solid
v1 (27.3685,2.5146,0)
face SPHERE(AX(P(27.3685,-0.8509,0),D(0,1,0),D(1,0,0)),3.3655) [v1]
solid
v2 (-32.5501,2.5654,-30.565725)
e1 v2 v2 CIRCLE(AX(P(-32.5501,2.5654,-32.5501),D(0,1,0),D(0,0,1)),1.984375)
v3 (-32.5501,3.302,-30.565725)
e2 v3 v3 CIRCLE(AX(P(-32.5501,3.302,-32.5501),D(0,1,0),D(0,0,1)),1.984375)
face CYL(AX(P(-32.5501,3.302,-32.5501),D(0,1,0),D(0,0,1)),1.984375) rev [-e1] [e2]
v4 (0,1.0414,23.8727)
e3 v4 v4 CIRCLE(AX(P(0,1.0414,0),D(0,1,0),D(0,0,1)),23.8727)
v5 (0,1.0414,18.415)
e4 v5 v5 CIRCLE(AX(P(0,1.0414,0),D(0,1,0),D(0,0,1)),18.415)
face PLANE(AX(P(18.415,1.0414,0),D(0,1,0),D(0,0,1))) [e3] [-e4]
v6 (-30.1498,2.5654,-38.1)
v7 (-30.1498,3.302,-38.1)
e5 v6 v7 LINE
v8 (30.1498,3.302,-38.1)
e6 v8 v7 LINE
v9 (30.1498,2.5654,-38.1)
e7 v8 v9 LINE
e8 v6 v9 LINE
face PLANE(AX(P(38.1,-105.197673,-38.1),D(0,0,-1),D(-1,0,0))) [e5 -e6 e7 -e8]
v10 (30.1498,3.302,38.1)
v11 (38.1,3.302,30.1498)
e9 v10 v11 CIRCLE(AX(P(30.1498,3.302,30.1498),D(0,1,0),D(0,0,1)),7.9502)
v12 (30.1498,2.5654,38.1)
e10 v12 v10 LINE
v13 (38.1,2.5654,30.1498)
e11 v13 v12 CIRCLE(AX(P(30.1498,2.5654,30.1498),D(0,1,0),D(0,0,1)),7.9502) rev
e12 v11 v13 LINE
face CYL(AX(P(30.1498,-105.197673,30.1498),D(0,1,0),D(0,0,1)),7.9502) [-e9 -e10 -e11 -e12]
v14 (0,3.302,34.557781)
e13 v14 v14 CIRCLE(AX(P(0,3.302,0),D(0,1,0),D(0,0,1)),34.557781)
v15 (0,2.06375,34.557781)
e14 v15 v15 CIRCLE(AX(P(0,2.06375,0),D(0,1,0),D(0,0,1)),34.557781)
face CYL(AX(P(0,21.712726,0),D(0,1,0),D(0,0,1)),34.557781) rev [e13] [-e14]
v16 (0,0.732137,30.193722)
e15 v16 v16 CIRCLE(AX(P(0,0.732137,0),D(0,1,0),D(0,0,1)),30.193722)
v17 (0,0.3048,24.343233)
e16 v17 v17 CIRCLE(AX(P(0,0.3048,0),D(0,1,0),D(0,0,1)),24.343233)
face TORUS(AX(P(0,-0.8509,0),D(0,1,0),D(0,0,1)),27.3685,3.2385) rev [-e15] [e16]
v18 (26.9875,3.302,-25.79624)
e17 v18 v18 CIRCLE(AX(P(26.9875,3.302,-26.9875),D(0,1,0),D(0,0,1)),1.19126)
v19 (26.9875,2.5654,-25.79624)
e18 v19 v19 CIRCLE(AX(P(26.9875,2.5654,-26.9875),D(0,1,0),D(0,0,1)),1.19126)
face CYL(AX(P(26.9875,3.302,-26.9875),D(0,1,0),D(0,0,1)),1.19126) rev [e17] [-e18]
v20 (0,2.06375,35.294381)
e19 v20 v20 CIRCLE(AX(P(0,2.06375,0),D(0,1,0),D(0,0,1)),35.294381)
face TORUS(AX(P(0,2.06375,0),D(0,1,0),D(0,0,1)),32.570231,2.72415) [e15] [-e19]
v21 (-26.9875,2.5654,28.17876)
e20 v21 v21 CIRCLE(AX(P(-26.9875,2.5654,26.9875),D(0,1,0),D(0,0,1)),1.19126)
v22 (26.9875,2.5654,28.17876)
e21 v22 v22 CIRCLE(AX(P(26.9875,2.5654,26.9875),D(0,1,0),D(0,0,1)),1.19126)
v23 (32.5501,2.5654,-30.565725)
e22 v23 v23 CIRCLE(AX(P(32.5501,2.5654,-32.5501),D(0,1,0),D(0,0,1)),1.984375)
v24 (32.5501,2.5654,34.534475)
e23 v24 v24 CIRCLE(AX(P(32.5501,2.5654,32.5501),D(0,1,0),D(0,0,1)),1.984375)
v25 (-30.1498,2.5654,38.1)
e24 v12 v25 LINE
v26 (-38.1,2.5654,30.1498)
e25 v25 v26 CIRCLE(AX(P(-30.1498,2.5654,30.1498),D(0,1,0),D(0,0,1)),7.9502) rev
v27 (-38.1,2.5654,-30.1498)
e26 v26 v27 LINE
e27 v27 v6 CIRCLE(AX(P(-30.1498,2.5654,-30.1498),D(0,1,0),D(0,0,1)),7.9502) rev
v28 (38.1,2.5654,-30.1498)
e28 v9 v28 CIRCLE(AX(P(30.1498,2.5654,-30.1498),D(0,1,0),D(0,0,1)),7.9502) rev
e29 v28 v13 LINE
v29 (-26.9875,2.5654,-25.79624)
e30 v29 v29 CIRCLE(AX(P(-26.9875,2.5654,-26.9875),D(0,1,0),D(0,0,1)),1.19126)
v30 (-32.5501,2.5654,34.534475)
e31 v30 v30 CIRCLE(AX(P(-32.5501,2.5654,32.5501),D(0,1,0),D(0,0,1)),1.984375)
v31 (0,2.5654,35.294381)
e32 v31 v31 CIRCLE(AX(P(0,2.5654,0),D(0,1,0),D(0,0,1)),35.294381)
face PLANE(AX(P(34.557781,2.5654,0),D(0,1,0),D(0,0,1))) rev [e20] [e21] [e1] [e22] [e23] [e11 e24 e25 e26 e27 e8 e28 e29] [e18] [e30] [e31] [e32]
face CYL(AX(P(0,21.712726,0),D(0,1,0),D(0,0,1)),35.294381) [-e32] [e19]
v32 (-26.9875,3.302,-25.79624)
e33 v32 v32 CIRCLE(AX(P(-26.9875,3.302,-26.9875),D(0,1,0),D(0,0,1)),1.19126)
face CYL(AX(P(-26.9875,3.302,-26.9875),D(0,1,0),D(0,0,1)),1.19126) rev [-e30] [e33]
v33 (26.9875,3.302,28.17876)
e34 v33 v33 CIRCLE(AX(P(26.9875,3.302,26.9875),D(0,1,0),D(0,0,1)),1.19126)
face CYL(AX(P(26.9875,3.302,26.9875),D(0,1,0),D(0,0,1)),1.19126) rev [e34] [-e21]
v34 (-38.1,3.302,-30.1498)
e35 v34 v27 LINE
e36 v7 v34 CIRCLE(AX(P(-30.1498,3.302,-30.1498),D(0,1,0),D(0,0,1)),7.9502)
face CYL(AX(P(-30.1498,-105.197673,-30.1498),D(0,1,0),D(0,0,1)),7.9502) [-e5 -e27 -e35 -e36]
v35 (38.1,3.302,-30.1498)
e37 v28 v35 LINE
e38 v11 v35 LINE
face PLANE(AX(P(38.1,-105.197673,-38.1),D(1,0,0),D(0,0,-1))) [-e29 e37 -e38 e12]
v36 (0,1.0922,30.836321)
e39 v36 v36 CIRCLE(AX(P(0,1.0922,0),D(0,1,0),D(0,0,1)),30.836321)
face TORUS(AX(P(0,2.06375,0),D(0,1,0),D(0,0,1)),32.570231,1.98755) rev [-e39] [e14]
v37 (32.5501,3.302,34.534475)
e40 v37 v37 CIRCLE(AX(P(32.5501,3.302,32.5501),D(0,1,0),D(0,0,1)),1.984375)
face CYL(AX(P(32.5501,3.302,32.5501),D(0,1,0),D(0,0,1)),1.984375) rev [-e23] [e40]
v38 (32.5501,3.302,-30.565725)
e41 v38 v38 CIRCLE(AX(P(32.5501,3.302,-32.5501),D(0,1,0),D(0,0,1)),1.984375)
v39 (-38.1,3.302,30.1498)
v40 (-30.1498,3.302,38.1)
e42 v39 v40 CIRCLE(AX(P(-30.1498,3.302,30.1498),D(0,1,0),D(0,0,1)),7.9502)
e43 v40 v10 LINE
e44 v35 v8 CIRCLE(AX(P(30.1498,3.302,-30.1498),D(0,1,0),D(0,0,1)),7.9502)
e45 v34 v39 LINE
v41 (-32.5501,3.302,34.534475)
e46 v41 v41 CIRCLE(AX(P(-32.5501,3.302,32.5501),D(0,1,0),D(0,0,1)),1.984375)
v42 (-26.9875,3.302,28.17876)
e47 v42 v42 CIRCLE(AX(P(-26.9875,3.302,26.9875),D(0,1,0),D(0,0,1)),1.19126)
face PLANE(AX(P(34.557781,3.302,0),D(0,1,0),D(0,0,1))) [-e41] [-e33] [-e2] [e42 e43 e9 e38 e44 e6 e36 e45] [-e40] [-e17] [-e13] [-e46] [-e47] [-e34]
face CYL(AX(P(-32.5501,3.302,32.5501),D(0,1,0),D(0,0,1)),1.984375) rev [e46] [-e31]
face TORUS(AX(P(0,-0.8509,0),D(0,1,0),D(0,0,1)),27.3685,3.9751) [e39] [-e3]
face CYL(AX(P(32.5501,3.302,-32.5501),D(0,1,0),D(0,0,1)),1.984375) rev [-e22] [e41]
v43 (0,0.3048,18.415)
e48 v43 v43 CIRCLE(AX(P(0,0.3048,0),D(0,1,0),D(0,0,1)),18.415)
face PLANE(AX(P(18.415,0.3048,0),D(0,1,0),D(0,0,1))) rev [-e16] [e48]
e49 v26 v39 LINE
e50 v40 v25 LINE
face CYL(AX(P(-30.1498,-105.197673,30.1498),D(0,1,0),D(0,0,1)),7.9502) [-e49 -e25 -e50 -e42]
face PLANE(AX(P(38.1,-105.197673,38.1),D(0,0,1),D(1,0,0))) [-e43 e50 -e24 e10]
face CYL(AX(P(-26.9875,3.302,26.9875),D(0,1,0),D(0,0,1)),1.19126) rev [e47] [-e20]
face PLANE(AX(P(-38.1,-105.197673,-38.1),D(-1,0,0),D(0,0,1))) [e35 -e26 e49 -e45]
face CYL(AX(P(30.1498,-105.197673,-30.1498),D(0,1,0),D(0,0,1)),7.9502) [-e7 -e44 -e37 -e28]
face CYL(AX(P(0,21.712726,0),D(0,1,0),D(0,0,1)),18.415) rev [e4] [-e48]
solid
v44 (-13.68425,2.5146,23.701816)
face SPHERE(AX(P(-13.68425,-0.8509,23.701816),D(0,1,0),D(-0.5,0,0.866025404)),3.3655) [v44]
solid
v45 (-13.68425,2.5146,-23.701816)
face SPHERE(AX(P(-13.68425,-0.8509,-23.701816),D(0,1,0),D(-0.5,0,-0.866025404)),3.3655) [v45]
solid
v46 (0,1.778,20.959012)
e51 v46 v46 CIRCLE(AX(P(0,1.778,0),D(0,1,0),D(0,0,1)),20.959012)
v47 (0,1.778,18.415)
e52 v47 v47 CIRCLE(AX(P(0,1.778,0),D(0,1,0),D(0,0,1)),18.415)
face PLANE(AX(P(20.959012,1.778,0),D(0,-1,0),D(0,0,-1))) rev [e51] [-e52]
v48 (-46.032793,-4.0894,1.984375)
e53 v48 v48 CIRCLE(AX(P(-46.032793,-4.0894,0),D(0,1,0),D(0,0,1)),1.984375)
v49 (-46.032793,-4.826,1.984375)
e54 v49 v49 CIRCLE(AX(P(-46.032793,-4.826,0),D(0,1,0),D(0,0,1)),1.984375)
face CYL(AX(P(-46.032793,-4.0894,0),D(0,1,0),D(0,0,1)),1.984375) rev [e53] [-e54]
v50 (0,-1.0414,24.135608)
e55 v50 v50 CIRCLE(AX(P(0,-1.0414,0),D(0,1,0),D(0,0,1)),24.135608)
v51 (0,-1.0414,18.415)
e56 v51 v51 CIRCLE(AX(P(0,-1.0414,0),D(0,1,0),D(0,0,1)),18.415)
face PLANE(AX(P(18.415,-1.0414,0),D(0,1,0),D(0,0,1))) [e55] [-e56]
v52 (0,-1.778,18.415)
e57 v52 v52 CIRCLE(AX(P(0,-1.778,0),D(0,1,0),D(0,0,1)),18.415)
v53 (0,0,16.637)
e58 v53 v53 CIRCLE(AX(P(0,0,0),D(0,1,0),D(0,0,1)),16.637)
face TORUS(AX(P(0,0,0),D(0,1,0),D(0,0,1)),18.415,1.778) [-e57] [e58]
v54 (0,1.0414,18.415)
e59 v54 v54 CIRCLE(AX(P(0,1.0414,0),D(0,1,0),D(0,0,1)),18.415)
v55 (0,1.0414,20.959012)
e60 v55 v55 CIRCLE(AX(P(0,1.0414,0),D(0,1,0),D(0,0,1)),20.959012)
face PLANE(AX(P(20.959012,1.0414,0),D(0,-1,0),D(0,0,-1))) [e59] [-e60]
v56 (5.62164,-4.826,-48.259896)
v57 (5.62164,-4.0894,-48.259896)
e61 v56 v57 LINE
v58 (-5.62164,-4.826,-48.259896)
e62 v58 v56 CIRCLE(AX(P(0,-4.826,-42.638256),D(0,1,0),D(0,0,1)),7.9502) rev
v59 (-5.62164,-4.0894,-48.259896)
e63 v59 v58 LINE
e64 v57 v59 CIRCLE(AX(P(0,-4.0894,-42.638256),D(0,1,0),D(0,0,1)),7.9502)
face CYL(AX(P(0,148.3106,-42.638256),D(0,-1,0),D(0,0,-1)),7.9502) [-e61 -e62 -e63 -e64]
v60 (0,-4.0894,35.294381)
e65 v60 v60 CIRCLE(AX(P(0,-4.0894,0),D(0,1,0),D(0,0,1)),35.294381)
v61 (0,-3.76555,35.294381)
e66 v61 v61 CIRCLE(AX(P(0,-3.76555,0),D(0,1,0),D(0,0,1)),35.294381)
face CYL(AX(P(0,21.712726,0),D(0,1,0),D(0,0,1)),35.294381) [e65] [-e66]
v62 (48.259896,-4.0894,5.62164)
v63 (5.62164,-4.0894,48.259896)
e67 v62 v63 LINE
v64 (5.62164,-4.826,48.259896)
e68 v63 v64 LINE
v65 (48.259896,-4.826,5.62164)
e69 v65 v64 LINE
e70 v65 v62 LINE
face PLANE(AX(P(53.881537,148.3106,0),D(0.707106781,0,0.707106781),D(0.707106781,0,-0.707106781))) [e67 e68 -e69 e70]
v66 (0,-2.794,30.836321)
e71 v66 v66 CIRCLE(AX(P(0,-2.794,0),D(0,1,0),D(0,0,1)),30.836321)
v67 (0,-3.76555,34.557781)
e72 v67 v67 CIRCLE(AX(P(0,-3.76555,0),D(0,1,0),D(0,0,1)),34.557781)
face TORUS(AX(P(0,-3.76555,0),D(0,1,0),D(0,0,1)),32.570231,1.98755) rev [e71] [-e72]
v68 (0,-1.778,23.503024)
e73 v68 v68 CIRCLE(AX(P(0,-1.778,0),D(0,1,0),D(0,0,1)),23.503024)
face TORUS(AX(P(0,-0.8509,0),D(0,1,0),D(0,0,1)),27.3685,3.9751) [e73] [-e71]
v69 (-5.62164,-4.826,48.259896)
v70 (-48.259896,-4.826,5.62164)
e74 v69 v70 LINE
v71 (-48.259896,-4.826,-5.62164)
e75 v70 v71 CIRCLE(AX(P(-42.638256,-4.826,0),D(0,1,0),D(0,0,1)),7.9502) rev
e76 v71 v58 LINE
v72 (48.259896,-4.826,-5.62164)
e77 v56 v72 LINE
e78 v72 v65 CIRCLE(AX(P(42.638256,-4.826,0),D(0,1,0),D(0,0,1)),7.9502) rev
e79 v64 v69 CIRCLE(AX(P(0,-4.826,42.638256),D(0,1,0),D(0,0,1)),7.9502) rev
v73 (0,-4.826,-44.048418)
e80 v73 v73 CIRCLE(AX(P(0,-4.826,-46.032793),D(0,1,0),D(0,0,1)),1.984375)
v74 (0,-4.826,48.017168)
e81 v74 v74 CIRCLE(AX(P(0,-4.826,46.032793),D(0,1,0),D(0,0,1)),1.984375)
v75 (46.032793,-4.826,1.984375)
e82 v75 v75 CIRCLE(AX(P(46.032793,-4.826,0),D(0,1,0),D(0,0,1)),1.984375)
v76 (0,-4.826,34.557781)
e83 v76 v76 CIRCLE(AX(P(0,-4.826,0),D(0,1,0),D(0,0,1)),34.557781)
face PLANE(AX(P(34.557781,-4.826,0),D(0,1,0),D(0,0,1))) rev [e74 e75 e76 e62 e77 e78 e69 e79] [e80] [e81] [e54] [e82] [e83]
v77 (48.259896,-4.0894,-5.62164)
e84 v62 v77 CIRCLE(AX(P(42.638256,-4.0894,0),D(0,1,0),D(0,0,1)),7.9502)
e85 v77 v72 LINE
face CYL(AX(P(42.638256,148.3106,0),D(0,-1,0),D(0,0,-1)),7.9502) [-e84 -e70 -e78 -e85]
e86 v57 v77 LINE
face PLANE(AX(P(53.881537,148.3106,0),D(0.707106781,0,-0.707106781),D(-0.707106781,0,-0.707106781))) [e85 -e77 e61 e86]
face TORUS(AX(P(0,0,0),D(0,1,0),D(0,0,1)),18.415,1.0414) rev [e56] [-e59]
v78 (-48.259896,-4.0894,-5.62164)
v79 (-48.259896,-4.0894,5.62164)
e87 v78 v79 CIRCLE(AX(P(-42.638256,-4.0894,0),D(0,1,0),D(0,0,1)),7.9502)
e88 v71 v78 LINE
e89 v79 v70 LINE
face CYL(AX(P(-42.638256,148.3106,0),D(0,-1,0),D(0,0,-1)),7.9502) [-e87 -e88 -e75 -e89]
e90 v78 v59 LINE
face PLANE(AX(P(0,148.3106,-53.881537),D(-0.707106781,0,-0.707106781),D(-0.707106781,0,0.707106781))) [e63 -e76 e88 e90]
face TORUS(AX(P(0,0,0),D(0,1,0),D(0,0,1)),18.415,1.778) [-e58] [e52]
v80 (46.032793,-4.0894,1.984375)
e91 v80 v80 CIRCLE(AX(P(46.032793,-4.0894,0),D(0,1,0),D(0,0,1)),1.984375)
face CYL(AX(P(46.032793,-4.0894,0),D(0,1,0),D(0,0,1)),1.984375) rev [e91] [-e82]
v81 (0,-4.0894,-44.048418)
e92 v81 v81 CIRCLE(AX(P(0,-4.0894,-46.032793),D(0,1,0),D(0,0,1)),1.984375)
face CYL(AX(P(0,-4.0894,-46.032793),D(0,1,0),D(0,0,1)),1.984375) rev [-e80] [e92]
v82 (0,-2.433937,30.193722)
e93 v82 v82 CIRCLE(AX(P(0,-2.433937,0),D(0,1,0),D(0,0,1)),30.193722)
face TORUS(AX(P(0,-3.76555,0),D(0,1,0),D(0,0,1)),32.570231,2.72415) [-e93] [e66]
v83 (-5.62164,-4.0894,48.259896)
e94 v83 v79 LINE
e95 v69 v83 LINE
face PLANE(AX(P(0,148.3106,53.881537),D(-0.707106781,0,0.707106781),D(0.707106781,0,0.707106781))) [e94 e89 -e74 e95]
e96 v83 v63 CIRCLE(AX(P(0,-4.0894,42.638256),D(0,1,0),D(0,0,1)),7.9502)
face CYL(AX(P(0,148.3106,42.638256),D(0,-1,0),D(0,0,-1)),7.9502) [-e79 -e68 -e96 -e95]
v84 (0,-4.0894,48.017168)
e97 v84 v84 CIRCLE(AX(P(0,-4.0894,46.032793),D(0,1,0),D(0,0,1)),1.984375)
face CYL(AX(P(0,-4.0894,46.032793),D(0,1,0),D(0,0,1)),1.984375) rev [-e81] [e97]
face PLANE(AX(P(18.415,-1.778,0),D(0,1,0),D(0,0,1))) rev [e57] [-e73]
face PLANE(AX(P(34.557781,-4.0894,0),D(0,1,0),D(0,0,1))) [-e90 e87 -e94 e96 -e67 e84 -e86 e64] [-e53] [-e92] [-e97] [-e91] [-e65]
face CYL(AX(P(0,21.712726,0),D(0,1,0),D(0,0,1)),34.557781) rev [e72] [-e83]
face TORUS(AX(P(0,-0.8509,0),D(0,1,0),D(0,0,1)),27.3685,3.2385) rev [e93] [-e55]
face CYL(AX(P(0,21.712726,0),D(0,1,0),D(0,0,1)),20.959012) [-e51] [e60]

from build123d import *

# Parameters (mm, degrees)
SKETCH2_R                                 = 34.557781481
EXTRUDE1_DEPTH                            = 0.7366
EXTRUDE2_START                            = -0.7366
SKETCH3_W                                 = 76.2
SKETCH3_H                                 = 76.2
SKETCH3_R                                 = 34.557781481
EXTRUDE2_DEPTH                            = 0.7366
CIRPATTERN1_COUNT                         = 3
FILLET1_R                                 = 7.9502
FILLET2_R                                 = 7.9502
SKETCH5_W                                 = 1.984375
SKETCH5_H                                 = 0.7366
F_5_32_0_156250_DIAMETER_HOLE1_AT_2_COUNT = 2
F_5_32_0_156250_DIAMETER_HOLE1_AT_2_PITCH = 65.1002
F_5_32_0_156250_DIAMETER_HOLE1_AT_3_COUNT = 2
F_5_32_0_156250_DIAMETER_HOLE1_AT_3_PITCH = 65.1002
F_5_32_0_156250_DIAMETER_HOLE1_AT_4_COUNT = 2
F_5_32_0_156250_DIAMETER_HOLE1_AT_4_PITCH = 92.065585753
SKETCH7_W                                 = 1.984375
SKETCH7_H                                 = 8.128
F_5_32_0_156250_DIAMETER_HOLE2_AT_2_COUNT = 2
F_5_32_0_156250_DIAMETER_HOLE2_AT_2_PITCH = 65.1002
F_5_32_0_156250_DIAMETER_HOLE2_AT_3_COUNT = 2
F_5_32_0_156250_DIAMETER_HOLE2_AT_3_PITCH = 92.065585753
F_5_32_0_156250_DIAMETER_HOLE2_AT_4_COUNT = 2
F_5_32_0_156250_DIAMETER_HOLE2_AT_4_PITCH = 65.1002
F_3_32_0_09375_DIAMETER_HOLE1_AT_2_COUNT  = 2
F_3_32_0_09375_DIAMETER_HOLE1_AT_2_PITCH  = 53.975
F_3_32_0_09375_DIAMETER_HOLE1_AT_3_COUNT  = 2
F_3_32_0_09375_DIAMETER_HOLE1_AT_3_PITCH  = 76.332177029
F_3_32_0_09375_DIAMETER_HOLE1_AT_4_COUNT  = 2
F_3_32_0_09375_DIAMETER_HOLE1_AT_4_PITCH  = 53.975


with BuildPart() as part:
    # Sketch1 → Revolve-Thin4 (revolve)
    with BuildSketch(Plane.XY, mode=Mode.PRIVATE) as revolve_thin4_sk:
        with BuildLine():
            Line((20.959011942, 1.778), (18.415, 1.778))
            ThreePointArc((18.415, 1.778), (16.637, 0), (18.415, -1.778))
            Line((18.415, -1.778), (23.503023884, -1.778))
            ThreePointArc((23.503023884, -1.778), (26.822976031, -4.788389506), (30.836320987, -2.794))
            ThreePointArc((30.836320987, -2.794), (33.072287853, -1.842454994), (34.557781481, -3.76555))
            Line((34.557781481, -3.76555), (34.557781481, -4.826))
            Line((34.557781481, -4.826), (38.1, -4.826))
            Line((38.1, -4.826), (38.1, -4.0894))
            Line((38.1, -4.0894), (35.294381481, -4.0894))
            Line((35.294381481, -4.0894), (35.294381481, -3.76555))
            ThreePointArc((35.294381481, -3.76555), (33.258353473, -1.129742468), (30.193721571, -2.433936741))
            ThreePointArc((30.193721571, -2.433936741), (26.643008112, -4.007091339), (24.135607796, -1.0414))
            Line((24.135607796, -1.0414), (18.415, -1.0414))
            ThreePointArc((18.415, -1.0414), (17.3736, 0), (18.415, 1.0414))
            Line((18.415, 1.0414), (20.959011942, 1.0414))
            Line((20.959011942, 1.0414), (20.959011942, 1.778))
        make_face()
    revolve(revolve_thin4_sk.sketch.rotate(Axis((0, 21.71272626, 0), (0, -1, 0)), 90), axis=Axis((0, 21.71272626, 0), (0, -1, 0)))

    # Sketch2 → Extrude1 (add)
    with BuildSketch(Plane.XZ.offset(4.826)):
        Polygon((53.881536726, 0), (0, -53.881536726), (-53.881536726, 0), (0, 53.881536726), align=None)
        with Locations(Location((0, 0, 0), (0, 0, 90))):
            Circle(SKETCH2_R, mode=Mode.SUBTRACT)
    extrude(amount=-EXTRUDE1_DEPTH)

    # Fillet2
    fillet2_edges = [part.edges().sort_by_distance(p)[0] for p in [
        (0, -4.4577, -53.881536726),
        (-53.881536726, -4.4577, 0),
        (0, -4.4577, 53.881536726),
        (53.881536726, -4.4577, 0),
    ]]
    fillet(fillet2_edges, radius=FILLET2_R)

    # Sketch5 → 5/32 (0.156250) Diameter Hole1 (revolve, cut)
    with BuildSketch(Plane(origin=(0, -4.0894, -46.032792877), x_dir=(0, 0, 1), z_dir=(1, 0, 0))):
        with Locations((0.9921875, 0.3683)):
            Rectangle(SKETCH5_W, SKETCH5_H)
    f_5_32_0_156250_diameter_hole1 = revolve(axis=Axis((0, 2.2606, -46.032792877), (0, -1, 0)), mode=Mode.SUBTRACT)

    # 5/32 (0.156250) Diameter Hole1 at 2: 5/32 (0.156250) Diameter Hole1 ×2
    with Locations(*[Vector(0.7071067811865476, 0, 0.7071067811865475) * (i * F_5_32_0_156250_DIAMETER_HOLE1_AT_2_PITCH) for i in range(1, F_5_32_0_156250_DIAMETER_HOLE1_AT_2_COUNT)]):
        add(f_5_32_0_156250_diameter_hole1, mode=Mode.SUBTRACT)

    # 5/32 (0.156250) Diameter Hole1 at 3: 5/32 (0.156250) Diameter Hole1 ×2
    with Locations(*[Vector(-0.7071067811865475, 0, 0.7071067811865477) * (i * F_5_32_0_156250_DIAMETER_HOLE1_AT_3_PITCH) for i in range(1, F_5_32_0_156250_DIAMETER_HOLE1_AT_3_COUNT)]):
        add(f_5_32_0_156250_diameter_hole1, mode=Mode.SUBTRACT)

    # 5/32 (0.156250) Diameter Hole1 at 4: 5/32 (0.156250) Diameter Hole1 ×2
    with Locations(*[(0, 0, i * F_5_32_0_156250_DIAMETER_HOLE1_AT_4_PITCH) for i in range(1, F_5_32_0_156250_DIAMETER_HOLE1_AT_4_COUNT)]):
        add(f_5_32_0_156250_diameter_hole1, mode=Mode.SUBTRACT)


with BuildPart() as body_2:
    # Sketch1<5> → Revolve-Thin5 (revolve)
    with BuildSketch(Plane.XY, mode=Mode.PRIVATE) as revolve_thin5_sk:
        with BuildLine():
            Line((18.415, 1.0414), (23.872699559, 1.0414))
            ThreePointArc((23.872699559, 1.0414), (27.339502199, 3.124094231), (30.836320987, 1.0922))
            ThreePointArc((30.836320987, 1.0922), (33.072287853, 0.140654994), (34.557781481, 2.06375))
            Line((34.557781481, 2.06375), (34.557781481, 3.302))
            Line((34.557781481, 3.302), (38.1, 3.302))
            Line((38.1, 3.302), (38.1, 2.5654))
            Line((38.1, 2.5654), (35.294381481, 2.5654))
            Line((35.294381481, 2.5654), (35.294381481, 2.06375))
            ThreePointArc((35.294381481, 2.06375), (33.258353473, -0.572057532), (30.193721571, 0.732136741))
            ThreePointArc((30.193721571, 0.732136741), (27.132579028, 2.378995284), (24.343233109, 0.3048))
            Line((24.343233109, 0.3048), (18.415, 0.3048))
            Line((18.415, 0.3048), (18.415, 1.0414))
        make_face()
    revolve(revolve_thin5_sk.sketch.rotate(Axis((0, 21.71272626, 0), (0, -1, 0)), 90), axis=Axis((0, 21.71272626, 0), (0, -1, 0)))

    # Sketch3 → Extrude2 (add)
    with BuildSketch(Plane(origin=(0, 3.302, 0), x_dir=(-1, 0, 0), z_dir=(0, 1, 0)).offset(EXTRUDE2_START)):
        Rectangle(SKETCH3_W, SKETCH3_H)
        with Locations(Location((0, 0, 0), (0, 0, 90))):
            Circle(SKETCH3_R, mode=Mode.SUBTRACT)
    extrude(amount=EXTRUDE2_DEPTH)

    # Fillet1
    fillet1_edges = [body_2.edges().sort_by_distance(p)[0] for p in [
        (-38.1, 2.9337, -38.1),
        (-38.1, 2.9337, 38.1),
        (38.1, 2.9337, 38.1),
        (38.1, 2.9337, -38.1),
    ]]
    fillet(fillet1_edges, radius=FILLET1_R)

    # Sketch7 → 5/32 (0.156250) Diameter Hole2 (revolve, cut)
    with BuildSketch(Plane(origin=(32.5501, 3.302, -32.5501), x_dir=(0, 0, 1), z_dir=(1, 0, 0))):
        with Locations((0.9921875, 4.064)):
            Rectangle(SKETCH7_W, SKETCH7_H)
    f_5_32_0_156250_diameter_hole2 = revolve(axis=Axis((32.5501, 9.652, -32.5501), (0, -1, 0)), mode=Mode.SUBTRACT)

    # 5/32 (0.156250) Diameter Hole2 at 2: 5/32 (0.156250) Diameter Hole2 ×2
    with Locations(*[(-i * F_5_32_0_156250_DIAMETER_HOLE2_AT_2_PITCH, 0, 0) for i in range(1, F_5_32_0_156250_DIAMETER_HOLE2_AT_2_COUNT)]):
        add(f_5_32_0_156250_diameter_hole2, mode=Mode.SUBTRACT)

    # 5/32 (0.156250) Diameter Hole2 at 3: 5/32 (0.156250) Diameter Hole2 ×2
    with Locations(*[Vector(-0.7071067811865476, 0, 0.7071067811865476) * (i * F_5_32_0_156250_DIAMETER_HOLE2_AT_3_PITCH) for i in range(1, F_5_32_0_156250_DIAMETER_HOLE2_AT_3_COUNT)]):
        add(f_5_32_0_156250_diameter_hole2, mode=Mode.SUBTRACT)

    # 5/32 (0.156250) Diameter Hole2 at 4: 5/32 (0.156250) Diameter Hole2 ×2
    with Locations(*[(0, 0, i * F_5_32_0_156250_DIAMETER_HOLE2_AT_4_PITCH) for i in range(1, F_5_32_0_156250_DIAMETER_HOLE2_AT_4_COUNT)]):
        add(f_5_32_0_156250_diameter_hole2, mode=Mode.SUBTRACT)

    # Sketch9 → 3/32 (0.09375) Diameter Hole1 (revolve, cut)
    with BuildSketch(Plane(origin=(-26.9875, 3.302, -26.9875), x_dir=(0, 0, 1), z_dir=(1, 0, 0))):
        Polygon((0, 0), (0, 3.890781221), (1.19126, 3.175), (1.19126, 0), align=None)
    f_3_32_0_09375_diameter_hole1 = revolve(axis=Axis((-26.9875, 9.652, -26.9875), (0, -1, 0)), mode=Mode.SUBTRACT)

    # 3/32 (0.09375) Diameter Hole1 at 2: 3/32 (0.09375) Diameter Hole1 ×2
    with Locations(*[(i * F_3_32_0_09375_DIAMETER_HOLE1_AT_2_PITCH, 0, 0) for i in range(1, F_3_32_0_09375_DIAMETER_HOLE1_AT_2_COUNT)]):
        add(f_3_32_0_09375_diameter_hole1, mode=Mode.SUBTRACT)

    # 3/32 (0.09375) Diameter Hole1 at 3: 3/32 (0.09375) Diameter Hole1 ×2
    with Locations(*[Vector(0.7071067811865476, 0, 0.7071067811865476) * (i * F_3_32_0_09375_DIAMETER_HOLE1_AT_3_PITCH) for i in range(1, F_3_32_0_09375_DIAMETER_HOLE1_AT_3_COUNT)]):
        add(f_3_32_0_09375_diameter_hole1, mode=Mode.SUBTRACT)

    # 3/32 (0.09375) Diameter Hole1 at 4: 3/32 (0.09375) Diameter Hole1 ×2
    with Locations(*[(0, 0, i * F_3_32_0_09375_DIAMETER_HOLE1_AT_4_PITCH) for i in range(1, F_3_32_0_09375_DIAMETER_HOLE1_AT_4_COUNT)]):
        add(f_3_32_0_09375_diameter_hole1, mode=Mode.SUBTRACT)


with BuildPart() as body_3:
    # Sketch4 → Revolve1 (revolve)
    with BuildSketch(Plane.XY):
        with BuildLine():
            Line((27.3685, 2.5146), (27.3685, -4.2164))
            ThreePointArc((27.3685, -4.2164), (30.734, -0.8509), (27.3685, 2.5146))
        make_face()
    revolve(axis=Axis((27.3685, 2.837450101, 0), (0, -1, 0)))


with BuildPart() as cirpattern1_1:
    # CirPattern1: pattern copy
    add(body_3.part.rotate(Axis((0, 0, 0), (0, 1, 0)), 1 * 360 / CIRPATTERN1_COUNT))


with BuildPart() as cirpattern1_2:
    # CirPattern1: pattern copy
    add(body_3.part.rotate(Axis((0, 0, 0), (0, 1, 0)), 2 * 360 / CIRPATTERN1_COUNT))


solid = Compound([part.part, body_2.part, body_3.part, cirpattern1_1.part, cirpattern1_2.part])
